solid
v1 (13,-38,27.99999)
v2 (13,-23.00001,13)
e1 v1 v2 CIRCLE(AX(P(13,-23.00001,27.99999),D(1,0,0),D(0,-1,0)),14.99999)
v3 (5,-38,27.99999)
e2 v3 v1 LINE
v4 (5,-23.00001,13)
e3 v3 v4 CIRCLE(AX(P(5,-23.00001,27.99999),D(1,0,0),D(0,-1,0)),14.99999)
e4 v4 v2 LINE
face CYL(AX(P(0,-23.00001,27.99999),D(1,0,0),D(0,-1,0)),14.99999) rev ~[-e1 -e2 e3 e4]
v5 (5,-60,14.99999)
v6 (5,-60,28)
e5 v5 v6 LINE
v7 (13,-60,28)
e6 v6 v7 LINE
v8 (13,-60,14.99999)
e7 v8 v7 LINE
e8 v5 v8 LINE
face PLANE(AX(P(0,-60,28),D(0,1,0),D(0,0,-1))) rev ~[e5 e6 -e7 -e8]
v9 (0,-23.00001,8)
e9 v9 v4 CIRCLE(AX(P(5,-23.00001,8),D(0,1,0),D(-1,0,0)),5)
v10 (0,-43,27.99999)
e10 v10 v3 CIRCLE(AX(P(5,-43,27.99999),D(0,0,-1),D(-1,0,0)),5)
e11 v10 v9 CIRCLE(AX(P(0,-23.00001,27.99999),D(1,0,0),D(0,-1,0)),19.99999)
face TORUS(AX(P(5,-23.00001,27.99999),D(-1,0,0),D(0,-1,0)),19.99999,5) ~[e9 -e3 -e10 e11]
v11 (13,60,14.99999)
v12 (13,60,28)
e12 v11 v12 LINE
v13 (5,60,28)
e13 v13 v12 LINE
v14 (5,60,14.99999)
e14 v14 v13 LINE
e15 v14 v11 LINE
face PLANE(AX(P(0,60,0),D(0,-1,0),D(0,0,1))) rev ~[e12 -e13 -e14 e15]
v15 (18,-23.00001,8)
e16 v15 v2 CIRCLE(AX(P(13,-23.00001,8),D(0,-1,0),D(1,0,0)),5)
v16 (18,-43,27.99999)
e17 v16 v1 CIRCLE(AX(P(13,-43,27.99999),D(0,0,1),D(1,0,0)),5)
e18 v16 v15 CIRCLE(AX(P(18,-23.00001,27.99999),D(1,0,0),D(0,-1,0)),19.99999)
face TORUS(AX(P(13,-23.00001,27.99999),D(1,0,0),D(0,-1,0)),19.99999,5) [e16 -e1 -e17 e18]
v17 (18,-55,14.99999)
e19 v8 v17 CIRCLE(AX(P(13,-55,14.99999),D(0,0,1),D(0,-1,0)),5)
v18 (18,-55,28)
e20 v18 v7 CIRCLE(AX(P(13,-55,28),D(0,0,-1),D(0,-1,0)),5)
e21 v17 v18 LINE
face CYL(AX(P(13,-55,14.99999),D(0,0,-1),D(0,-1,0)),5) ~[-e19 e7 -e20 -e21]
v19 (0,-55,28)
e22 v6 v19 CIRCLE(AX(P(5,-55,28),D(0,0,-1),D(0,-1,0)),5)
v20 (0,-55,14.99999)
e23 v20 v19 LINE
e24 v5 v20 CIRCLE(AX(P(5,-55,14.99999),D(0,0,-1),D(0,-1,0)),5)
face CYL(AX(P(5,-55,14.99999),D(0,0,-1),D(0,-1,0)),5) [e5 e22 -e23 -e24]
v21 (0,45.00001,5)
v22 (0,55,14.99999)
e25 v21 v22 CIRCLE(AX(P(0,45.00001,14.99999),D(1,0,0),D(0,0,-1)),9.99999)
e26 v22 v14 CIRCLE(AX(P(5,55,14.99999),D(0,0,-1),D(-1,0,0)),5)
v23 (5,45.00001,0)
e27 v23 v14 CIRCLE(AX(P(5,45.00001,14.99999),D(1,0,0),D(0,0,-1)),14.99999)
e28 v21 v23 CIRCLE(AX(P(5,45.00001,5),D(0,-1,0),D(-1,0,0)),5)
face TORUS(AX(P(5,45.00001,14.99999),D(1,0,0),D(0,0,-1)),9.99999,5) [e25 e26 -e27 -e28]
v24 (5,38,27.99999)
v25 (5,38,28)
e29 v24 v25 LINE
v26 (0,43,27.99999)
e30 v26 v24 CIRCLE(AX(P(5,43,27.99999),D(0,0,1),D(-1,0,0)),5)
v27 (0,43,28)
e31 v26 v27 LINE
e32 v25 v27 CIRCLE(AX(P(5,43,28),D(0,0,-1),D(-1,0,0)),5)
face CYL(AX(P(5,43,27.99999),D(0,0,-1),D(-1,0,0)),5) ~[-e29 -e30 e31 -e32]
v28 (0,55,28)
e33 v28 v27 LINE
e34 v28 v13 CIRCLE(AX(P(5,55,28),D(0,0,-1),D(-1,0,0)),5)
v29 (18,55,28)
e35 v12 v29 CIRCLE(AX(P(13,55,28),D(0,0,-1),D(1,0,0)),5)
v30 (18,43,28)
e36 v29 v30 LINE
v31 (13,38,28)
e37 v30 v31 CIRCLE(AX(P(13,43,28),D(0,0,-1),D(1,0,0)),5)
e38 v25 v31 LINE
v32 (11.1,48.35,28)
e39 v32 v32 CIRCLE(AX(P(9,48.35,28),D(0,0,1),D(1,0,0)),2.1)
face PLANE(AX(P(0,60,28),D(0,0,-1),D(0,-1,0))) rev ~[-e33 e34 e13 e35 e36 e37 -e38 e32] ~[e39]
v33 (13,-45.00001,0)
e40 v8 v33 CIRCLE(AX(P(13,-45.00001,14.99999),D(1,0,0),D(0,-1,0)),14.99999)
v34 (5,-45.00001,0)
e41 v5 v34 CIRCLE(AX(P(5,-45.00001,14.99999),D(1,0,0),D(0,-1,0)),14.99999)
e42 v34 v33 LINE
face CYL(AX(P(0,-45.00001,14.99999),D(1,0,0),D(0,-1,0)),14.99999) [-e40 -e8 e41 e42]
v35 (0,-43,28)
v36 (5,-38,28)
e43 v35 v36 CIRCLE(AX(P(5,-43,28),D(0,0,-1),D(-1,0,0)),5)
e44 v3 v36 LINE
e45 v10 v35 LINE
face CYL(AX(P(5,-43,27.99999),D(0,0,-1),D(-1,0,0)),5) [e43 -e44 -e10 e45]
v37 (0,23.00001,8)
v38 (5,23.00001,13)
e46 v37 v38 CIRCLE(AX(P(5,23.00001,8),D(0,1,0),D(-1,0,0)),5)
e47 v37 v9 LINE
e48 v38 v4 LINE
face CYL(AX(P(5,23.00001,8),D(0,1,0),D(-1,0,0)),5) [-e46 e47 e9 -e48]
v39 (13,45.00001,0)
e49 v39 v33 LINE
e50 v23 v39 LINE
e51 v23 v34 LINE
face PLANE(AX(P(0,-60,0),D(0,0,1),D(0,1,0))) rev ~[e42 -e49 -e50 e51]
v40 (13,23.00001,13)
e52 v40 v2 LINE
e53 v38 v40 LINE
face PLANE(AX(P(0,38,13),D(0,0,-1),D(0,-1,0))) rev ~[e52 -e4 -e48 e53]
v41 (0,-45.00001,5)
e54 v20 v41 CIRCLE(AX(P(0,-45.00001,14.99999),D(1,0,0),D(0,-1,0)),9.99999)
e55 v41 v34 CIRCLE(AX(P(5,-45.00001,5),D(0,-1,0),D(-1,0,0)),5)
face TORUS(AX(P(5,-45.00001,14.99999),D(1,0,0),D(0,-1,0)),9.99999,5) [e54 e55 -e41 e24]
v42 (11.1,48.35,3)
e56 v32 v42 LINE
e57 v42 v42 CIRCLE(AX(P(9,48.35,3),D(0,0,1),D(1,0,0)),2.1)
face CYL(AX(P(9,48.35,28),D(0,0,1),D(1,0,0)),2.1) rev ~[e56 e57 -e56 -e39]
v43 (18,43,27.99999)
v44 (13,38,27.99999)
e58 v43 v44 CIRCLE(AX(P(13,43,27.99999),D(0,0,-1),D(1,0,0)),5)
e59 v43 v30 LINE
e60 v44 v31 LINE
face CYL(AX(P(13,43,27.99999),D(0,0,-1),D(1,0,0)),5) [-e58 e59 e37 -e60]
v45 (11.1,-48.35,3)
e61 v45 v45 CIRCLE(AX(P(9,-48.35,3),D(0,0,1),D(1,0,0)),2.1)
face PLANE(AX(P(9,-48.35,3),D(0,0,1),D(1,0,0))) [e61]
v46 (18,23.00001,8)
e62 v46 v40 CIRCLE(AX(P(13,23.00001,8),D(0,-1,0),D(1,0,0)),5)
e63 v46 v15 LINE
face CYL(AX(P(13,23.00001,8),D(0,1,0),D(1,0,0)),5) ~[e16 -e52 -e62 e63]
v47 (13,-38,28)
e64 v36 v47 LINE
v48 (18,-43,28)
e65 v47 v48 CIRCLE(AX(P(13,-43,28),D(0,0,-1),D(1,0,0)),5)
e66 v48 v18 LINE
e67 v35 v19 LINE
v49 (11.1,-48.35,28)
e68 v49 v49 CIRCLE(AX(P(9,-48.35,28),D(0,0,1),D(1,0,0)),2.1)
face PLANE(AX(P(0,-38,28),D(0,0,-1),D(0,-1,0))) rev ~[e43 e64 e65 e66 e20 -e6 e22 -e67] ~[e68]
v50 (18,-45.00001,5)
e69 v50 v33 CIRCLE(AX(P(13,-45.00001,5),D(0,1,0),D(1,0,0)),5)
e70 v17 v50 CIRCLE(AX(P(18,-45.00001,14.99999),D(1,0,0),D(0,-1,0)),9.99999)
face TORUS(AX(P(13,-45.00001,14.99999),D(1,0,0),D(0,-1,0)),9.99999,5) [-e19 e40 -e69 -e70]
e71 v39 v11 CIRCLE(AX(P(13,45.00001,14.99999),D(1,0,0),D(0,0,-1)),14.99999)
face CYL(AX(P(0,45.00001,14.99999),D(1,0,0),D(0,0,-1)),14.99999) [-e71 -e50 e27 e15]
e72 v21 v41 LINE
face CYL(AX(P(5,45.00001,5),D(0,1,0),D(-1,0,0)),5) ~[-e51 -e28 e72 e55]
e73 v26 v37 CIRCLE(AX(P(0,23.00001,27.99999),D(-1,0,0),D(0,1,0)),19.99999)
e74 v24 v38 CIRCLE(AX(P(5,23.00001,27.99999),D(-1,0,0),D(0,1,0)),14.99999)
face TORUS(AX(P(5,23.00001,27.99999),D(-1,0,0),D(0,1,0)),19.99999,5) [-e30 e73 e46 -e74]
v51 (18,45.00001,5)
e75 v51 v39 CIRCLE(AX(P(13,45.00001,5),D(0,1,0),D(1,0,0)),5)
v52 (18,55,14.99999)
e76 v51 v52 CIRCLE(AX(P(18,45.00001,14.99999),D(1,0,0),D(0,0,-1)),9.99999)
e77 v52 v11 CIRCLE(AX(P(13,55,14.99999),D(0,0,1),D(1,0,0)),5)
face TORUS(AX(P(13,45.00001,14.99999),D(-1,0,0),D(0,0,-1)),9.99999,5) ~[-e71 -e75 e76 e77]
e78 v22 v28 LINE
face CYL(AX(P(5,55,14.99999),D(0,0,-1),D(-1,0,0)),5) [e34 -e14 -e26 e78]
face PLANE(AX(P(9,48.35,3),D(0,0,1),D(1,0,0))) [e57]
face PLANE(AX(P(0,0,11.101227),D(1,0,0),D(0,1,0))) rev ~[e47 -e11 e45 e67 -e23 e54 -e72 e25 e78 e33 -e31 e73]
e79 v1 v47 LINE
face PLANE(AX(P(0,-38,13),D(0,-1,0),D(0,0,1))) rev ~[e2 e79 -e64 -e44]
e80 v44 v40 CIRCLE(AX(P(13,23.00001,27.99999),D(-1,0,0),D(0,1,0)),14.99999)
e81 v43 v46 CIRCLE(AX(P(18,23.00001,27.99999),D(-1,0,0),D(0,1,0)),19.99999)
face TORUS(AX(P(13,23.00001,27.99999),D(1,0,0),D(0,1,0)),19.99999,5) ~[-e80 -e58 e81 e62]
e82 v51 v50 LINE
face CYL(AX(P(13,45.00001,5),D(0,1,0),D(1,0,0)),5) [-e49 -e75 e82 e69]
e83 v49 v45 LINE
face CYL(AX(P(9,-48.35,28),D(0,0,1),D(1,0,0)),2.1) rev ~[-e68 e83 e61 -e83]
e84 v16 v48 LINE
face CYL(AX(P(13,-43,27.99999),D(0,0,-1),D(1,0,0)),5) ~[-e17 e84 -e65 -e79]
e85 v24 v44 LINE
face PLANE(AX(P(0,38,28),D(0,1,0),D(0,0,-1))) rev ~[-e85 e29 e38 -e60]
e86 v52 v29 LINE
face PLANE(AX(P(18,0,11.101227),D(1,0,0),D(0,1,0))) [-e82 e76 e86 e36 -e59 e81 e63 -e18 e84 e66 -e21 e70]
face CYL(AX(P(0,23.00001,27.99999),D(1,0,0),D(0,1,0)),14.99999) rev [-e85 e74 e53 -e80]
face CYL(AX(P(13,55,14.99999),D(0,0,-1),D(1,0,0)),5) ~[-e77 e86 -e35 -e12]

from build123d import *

# Parameters (mm, degrees)
F1_DEPTH     = 18
F3_R         = 2.1
F4_DEPTH     = 25
F5_R         = 14.99999
F6_T1_DEPTH  = 90.00002
F6_T3_DEPTH  = 46.00002
F6_T5_DEPTH  = 12.50001
F6_T7_DEPTH  = 25.50001
F6_T10_ANGLE = 90
F6_T12_ANGLE = 90
F6_T14_ANGLE = 90
F6_T16_ANGLE = 90
F6_T18_ANGLE = 90
F6_T20_ANGLE = 90
F6_T22_ANGLE = 90
F6_T24_ANGLE = 90


# Not quite as in the source:
# - a fillet or chamfer that OpenCascade refuses, or shapes differently, is made with other operations: its cross-section is extruded or revolved along the edge and cut away or added
# - a fillet or chamfer is up to 0.001 mm smaller than in the source, because OpenCascade refuses the exact size


with BuildPart() as f1:
    # F0 (on Right) → F1 (new body)
    with BuildSketch(Plane.YZ):
        Polygon((-60, 28), (-60, 0), (0, 0), (60, 0), (60, 28), (38, 28), (38, 13), (-38, 13), (-38, 28), align=None)
    extrude(amount=F1_DEPTH)

    # F3 (on offset) → F4 (cut)
    with BuildSketch(Plane.XY.offset(28)):
        with Locations((9, 48.35)):
            Circle(F3_R)
        with Locations((9, -48.35)):
            Circle(F3_R)
    extrude(amount=-F4_DEPTH, mode=Mode.SUBTRACT)

    # F5 (radius 15 in the source; OpenCascade refuses exactly that, so slightly less here)
    f5_edges = [f1.edges().sort_by_distance(p)[0] for p in [
        (9, 60, 0),
        (9, -60, 0),
        (9, -38, 13),
        (9, 38, 13),
    ]]
    fillet(f5_edges, radius=F5_R)

    # F6: fillet of radius 5 on 4 edges, made by hand

    # F6_s2 → F6_t1 (cut)
    with BuildSketch(Plane.XZ.offset(-45.00001)):
        with BuildLine():
            ThreePointArc((0, 5), (1.4644660941, 1.4644660941), (5, 0))
            Line((5, 0), (0, 0))
            Line((0, 0), (0, 5))
        make_face()
        with BuildLine():
            ThreePointArc((18, 5), (16.5355339059, 1.4644660941), (13, 0))
            Line((13, 0), (18, 0))
            Line((18, 0), (18, 5))
        make_face()
    extrude(amount=F6_T1_DEPTH, mode=Mode.SUBTRACT)

    # F6_s4 → F6_t3 (cut)
    with BuildSketch(Plane.XZ.offset(-23.00001)):
        with BuildLine():
            ThreePointArc((0, 8), (1.4644660941, 11.5355339059), (5, 13))
            Line((5, 13), (0, 13))
            Line((0, 13), (0, 8))
        make_face()
        with BuildLine():
            ThreePointArc((18, 8), (16.5355339059, 11.5355339059), (13, 13))
            Line((13, 13), (18, 13))
            Line((18, 13), (18, 8))
        make_face()
    extrude(amount=F6_T3_DEPTH, mode=Mode.SUBTRACT)

    # F6_s6 → F6_t5 (cut)
    with BuildSketch(Plane.XY.offset(27.99999)):
        with BuildLine():
            ThreePointArc((18, -43), (16.5355339059, -39.4644660941), (13, -38))
            Line((13, -38), (18, -38))
            Line((18, -38), (18, -43))
        make_face()
        with BuildLine():
            ThreePointArc((18, 43), (16.5355339059, 39.4644660941), (13, 38))
            Line((13, 38), (18, 38))
            Line((18, 38), (18, 43))
        make_face()
        with BuildLine():
            ThreePointArc((0, -43), (1.4644660941, -39.4644660941), (5, -38))
            Line((5, -38), (0, -38))
            Line((0, -38), (0, -43))
        make_face()
        with BuildLine():
            ThreePointArc((0, 43), (1.4644660941, 39.4644660941), (5, 38))
            Line((5, 38), (0, 38))
            Line((0, 38), (0, 43))
        make_face()
    extrude(amount=F6_T5_DEPTH, mode=Mode.SUBTRACT)

    # F6_s8 → F6_t7 (cut)
    with BuildSketch(Plane.XY.offset(14.99999)):
        with BuildLine():
            ThreePointArc((13, -60), (16.5355339059, -58.5355339059), (18, -55))
            Line((18, -55), (18, -60))
            Line((18, -60), (13, -60))
        make_face()
        with BuildLine():
            ThreePointArc((18, 55), (16.5355339059, 58.5355339059), (13, 60))
            Line((13, 60), (18, 60))
            Line((18, 60), (18, 55))
        make_face()
        with BuildLine():
            ThreePointArc((0, 55), (1.4644660941, 58.5355339059), (5, 60))
            Line((5, 60), (0, 60))
            Line((0, 60), (0, 55))
        make_face()
        with BuildLine():
            ThreePointArc((5, -60), (1.4644660941, -58.5355339059), (0, -55))
            Line((0, -55), (0, -60))
            Line((0, -60), (5, -60))
        make_face()
    extrude(amount=F6_T7_DEPTH, mode=Mode.SUBTRACT)

    # F6_s9 → F6_t10 (revolve, cut)
    with BuildSketch(Plane.XY.offset(27.99999)):
        with BuildLine():
            ThreePointArc((18, 43), (16.5355339059, 39.4644660941), (13, 38))
            Line((13, 38), (18, 38))
            Line((18, 38), (18, 43))
        make_face()
    revolve(axis=Axis((18, 23.00001, 27.99999), (-1, 0, 0)), revolution_arc=F6_T10_ANGLE, mode=Mode.SUBTRACT)

    # F6_s11 → F6_t12 (revolve, cut)
    with BuildSketch(Plane.XY.offset(27.99999)):
        with BuildLine():
            ThreePointArc((18, -43), (16.5355339059, -39.4644660941), (13, -38))
            Line((13, -38), (18, -38))
            Line((18, -38), (18, -43))
        make_face()
    revolve(axis=Axis((18, -23.00001, 27.99999), (1, 0, 0)), revolution_arc=F6_T12_ANGLE, mode=Mode.SUBTRACT)

    # F6_s13 → F6_t14 (revolve, cut)
    with BuildSketch(Plane.XY.offset(27.99999)):
        with BuildLine():
            ThreePointArc((0, 43), (1.4644660941, 39.4644660941), (5, 38))
            Line((5, 38), (0, 38))
            Line((0, 38), (0, 43))
        make_face()
    revolve(axis=Axis((0, 23.00001, 27.99999), (-1, 0, 0)), revolution_arc=F6_T14_ANGLE, mode=Mode.SUBTRACT)

    # F6_s15 → F6_t16 (revolve, cut)
    with BuildSketch(Plane.XY.offset(27.99999)):
        with BuildLine():
            ThreePointArc((0, -43), (1.4644660941, -39.4644660941), (5, -38))
            Line((5, -38), (0, -38))
            Line((0, -38), (0, -43))
        make_face()
    revolve(axis=Axis((0, -23.00001, 27.99999), (1, 0, 0)), revolution_arc=F6_T16_ANGLE, mode=Mode.SUBTRACT)

    # F6_s17 → F6_t18 (revolve, cut)
    with BuildSketch(Plane.XZ.offset(-45.00001)):
        with BuildLine():
            ThreePointArc((18, 5), (16.5355339059, 1.4644660941), (13, 0))
            Line((13, 0), (18, 0))
            Line((18, 0), (18, 5))
        make_face()
    revolve(axis=Axis((18, 45.00001, 14.99999), (1, 0, 0)), revolution_arc=F6_T18_ANGLE, mode=Mode.SUBTRACT)

    # F6_s19 → F6_t20 (revolve, cut)
    with BuildSketch(Plane.XY.offset(14.99999)):
        with BuildLine():
            ThreePointArc((13, -60), (16.5355339059, -58.5355339059), (18, -55))
            Line((18, -55), (18, -60))
            Line((18, -60), (13, -60))
        make_face()
    revolve(axis=Axis((18, -45.00001, 14.99999), (1, 0, 0)), revolution_arc=F6_T20_ANGLE, mode=Mode.SUBTRACT)

    # F6_s21 → F6_t22 (revolve, cut)
    with BuildSketch(Plane.XY.offset(14.99999)):
        with BuildLine():
            ThreePointArc((0, -55), (1.4644660941, -58.5355339059), (5, -60))
            Line((5, -60), (0, -60))
            Line((0, -60), (0, -55))
        make_face()
    revolve(axis=Axis((0, -45.00001, 14.99999), (1, 0, 0)), revolution_arc=F6_T22_ANGLE, mode=Mode.SUBTRACT)

    # F6_s23 → F6_t24 (revolve, cut)
    with BuildSketch(Plane.XZ.offset(-45.00001)):
        with BuildLine():
            ThreePointArc((0, 5), (1.4644660941, 1.4644660941), (5, 0))
            Line((5, 0), (0, 0))
            Line((0, 0), (0, 5))
        make_face()
    revolve(axis=Axis((0, 45.00001, 14.99999), (1, 0, 0)), revolution_arc=F6_T24_ANGLE, mode=Mode.SUBTRACT)


solid = f1.part
